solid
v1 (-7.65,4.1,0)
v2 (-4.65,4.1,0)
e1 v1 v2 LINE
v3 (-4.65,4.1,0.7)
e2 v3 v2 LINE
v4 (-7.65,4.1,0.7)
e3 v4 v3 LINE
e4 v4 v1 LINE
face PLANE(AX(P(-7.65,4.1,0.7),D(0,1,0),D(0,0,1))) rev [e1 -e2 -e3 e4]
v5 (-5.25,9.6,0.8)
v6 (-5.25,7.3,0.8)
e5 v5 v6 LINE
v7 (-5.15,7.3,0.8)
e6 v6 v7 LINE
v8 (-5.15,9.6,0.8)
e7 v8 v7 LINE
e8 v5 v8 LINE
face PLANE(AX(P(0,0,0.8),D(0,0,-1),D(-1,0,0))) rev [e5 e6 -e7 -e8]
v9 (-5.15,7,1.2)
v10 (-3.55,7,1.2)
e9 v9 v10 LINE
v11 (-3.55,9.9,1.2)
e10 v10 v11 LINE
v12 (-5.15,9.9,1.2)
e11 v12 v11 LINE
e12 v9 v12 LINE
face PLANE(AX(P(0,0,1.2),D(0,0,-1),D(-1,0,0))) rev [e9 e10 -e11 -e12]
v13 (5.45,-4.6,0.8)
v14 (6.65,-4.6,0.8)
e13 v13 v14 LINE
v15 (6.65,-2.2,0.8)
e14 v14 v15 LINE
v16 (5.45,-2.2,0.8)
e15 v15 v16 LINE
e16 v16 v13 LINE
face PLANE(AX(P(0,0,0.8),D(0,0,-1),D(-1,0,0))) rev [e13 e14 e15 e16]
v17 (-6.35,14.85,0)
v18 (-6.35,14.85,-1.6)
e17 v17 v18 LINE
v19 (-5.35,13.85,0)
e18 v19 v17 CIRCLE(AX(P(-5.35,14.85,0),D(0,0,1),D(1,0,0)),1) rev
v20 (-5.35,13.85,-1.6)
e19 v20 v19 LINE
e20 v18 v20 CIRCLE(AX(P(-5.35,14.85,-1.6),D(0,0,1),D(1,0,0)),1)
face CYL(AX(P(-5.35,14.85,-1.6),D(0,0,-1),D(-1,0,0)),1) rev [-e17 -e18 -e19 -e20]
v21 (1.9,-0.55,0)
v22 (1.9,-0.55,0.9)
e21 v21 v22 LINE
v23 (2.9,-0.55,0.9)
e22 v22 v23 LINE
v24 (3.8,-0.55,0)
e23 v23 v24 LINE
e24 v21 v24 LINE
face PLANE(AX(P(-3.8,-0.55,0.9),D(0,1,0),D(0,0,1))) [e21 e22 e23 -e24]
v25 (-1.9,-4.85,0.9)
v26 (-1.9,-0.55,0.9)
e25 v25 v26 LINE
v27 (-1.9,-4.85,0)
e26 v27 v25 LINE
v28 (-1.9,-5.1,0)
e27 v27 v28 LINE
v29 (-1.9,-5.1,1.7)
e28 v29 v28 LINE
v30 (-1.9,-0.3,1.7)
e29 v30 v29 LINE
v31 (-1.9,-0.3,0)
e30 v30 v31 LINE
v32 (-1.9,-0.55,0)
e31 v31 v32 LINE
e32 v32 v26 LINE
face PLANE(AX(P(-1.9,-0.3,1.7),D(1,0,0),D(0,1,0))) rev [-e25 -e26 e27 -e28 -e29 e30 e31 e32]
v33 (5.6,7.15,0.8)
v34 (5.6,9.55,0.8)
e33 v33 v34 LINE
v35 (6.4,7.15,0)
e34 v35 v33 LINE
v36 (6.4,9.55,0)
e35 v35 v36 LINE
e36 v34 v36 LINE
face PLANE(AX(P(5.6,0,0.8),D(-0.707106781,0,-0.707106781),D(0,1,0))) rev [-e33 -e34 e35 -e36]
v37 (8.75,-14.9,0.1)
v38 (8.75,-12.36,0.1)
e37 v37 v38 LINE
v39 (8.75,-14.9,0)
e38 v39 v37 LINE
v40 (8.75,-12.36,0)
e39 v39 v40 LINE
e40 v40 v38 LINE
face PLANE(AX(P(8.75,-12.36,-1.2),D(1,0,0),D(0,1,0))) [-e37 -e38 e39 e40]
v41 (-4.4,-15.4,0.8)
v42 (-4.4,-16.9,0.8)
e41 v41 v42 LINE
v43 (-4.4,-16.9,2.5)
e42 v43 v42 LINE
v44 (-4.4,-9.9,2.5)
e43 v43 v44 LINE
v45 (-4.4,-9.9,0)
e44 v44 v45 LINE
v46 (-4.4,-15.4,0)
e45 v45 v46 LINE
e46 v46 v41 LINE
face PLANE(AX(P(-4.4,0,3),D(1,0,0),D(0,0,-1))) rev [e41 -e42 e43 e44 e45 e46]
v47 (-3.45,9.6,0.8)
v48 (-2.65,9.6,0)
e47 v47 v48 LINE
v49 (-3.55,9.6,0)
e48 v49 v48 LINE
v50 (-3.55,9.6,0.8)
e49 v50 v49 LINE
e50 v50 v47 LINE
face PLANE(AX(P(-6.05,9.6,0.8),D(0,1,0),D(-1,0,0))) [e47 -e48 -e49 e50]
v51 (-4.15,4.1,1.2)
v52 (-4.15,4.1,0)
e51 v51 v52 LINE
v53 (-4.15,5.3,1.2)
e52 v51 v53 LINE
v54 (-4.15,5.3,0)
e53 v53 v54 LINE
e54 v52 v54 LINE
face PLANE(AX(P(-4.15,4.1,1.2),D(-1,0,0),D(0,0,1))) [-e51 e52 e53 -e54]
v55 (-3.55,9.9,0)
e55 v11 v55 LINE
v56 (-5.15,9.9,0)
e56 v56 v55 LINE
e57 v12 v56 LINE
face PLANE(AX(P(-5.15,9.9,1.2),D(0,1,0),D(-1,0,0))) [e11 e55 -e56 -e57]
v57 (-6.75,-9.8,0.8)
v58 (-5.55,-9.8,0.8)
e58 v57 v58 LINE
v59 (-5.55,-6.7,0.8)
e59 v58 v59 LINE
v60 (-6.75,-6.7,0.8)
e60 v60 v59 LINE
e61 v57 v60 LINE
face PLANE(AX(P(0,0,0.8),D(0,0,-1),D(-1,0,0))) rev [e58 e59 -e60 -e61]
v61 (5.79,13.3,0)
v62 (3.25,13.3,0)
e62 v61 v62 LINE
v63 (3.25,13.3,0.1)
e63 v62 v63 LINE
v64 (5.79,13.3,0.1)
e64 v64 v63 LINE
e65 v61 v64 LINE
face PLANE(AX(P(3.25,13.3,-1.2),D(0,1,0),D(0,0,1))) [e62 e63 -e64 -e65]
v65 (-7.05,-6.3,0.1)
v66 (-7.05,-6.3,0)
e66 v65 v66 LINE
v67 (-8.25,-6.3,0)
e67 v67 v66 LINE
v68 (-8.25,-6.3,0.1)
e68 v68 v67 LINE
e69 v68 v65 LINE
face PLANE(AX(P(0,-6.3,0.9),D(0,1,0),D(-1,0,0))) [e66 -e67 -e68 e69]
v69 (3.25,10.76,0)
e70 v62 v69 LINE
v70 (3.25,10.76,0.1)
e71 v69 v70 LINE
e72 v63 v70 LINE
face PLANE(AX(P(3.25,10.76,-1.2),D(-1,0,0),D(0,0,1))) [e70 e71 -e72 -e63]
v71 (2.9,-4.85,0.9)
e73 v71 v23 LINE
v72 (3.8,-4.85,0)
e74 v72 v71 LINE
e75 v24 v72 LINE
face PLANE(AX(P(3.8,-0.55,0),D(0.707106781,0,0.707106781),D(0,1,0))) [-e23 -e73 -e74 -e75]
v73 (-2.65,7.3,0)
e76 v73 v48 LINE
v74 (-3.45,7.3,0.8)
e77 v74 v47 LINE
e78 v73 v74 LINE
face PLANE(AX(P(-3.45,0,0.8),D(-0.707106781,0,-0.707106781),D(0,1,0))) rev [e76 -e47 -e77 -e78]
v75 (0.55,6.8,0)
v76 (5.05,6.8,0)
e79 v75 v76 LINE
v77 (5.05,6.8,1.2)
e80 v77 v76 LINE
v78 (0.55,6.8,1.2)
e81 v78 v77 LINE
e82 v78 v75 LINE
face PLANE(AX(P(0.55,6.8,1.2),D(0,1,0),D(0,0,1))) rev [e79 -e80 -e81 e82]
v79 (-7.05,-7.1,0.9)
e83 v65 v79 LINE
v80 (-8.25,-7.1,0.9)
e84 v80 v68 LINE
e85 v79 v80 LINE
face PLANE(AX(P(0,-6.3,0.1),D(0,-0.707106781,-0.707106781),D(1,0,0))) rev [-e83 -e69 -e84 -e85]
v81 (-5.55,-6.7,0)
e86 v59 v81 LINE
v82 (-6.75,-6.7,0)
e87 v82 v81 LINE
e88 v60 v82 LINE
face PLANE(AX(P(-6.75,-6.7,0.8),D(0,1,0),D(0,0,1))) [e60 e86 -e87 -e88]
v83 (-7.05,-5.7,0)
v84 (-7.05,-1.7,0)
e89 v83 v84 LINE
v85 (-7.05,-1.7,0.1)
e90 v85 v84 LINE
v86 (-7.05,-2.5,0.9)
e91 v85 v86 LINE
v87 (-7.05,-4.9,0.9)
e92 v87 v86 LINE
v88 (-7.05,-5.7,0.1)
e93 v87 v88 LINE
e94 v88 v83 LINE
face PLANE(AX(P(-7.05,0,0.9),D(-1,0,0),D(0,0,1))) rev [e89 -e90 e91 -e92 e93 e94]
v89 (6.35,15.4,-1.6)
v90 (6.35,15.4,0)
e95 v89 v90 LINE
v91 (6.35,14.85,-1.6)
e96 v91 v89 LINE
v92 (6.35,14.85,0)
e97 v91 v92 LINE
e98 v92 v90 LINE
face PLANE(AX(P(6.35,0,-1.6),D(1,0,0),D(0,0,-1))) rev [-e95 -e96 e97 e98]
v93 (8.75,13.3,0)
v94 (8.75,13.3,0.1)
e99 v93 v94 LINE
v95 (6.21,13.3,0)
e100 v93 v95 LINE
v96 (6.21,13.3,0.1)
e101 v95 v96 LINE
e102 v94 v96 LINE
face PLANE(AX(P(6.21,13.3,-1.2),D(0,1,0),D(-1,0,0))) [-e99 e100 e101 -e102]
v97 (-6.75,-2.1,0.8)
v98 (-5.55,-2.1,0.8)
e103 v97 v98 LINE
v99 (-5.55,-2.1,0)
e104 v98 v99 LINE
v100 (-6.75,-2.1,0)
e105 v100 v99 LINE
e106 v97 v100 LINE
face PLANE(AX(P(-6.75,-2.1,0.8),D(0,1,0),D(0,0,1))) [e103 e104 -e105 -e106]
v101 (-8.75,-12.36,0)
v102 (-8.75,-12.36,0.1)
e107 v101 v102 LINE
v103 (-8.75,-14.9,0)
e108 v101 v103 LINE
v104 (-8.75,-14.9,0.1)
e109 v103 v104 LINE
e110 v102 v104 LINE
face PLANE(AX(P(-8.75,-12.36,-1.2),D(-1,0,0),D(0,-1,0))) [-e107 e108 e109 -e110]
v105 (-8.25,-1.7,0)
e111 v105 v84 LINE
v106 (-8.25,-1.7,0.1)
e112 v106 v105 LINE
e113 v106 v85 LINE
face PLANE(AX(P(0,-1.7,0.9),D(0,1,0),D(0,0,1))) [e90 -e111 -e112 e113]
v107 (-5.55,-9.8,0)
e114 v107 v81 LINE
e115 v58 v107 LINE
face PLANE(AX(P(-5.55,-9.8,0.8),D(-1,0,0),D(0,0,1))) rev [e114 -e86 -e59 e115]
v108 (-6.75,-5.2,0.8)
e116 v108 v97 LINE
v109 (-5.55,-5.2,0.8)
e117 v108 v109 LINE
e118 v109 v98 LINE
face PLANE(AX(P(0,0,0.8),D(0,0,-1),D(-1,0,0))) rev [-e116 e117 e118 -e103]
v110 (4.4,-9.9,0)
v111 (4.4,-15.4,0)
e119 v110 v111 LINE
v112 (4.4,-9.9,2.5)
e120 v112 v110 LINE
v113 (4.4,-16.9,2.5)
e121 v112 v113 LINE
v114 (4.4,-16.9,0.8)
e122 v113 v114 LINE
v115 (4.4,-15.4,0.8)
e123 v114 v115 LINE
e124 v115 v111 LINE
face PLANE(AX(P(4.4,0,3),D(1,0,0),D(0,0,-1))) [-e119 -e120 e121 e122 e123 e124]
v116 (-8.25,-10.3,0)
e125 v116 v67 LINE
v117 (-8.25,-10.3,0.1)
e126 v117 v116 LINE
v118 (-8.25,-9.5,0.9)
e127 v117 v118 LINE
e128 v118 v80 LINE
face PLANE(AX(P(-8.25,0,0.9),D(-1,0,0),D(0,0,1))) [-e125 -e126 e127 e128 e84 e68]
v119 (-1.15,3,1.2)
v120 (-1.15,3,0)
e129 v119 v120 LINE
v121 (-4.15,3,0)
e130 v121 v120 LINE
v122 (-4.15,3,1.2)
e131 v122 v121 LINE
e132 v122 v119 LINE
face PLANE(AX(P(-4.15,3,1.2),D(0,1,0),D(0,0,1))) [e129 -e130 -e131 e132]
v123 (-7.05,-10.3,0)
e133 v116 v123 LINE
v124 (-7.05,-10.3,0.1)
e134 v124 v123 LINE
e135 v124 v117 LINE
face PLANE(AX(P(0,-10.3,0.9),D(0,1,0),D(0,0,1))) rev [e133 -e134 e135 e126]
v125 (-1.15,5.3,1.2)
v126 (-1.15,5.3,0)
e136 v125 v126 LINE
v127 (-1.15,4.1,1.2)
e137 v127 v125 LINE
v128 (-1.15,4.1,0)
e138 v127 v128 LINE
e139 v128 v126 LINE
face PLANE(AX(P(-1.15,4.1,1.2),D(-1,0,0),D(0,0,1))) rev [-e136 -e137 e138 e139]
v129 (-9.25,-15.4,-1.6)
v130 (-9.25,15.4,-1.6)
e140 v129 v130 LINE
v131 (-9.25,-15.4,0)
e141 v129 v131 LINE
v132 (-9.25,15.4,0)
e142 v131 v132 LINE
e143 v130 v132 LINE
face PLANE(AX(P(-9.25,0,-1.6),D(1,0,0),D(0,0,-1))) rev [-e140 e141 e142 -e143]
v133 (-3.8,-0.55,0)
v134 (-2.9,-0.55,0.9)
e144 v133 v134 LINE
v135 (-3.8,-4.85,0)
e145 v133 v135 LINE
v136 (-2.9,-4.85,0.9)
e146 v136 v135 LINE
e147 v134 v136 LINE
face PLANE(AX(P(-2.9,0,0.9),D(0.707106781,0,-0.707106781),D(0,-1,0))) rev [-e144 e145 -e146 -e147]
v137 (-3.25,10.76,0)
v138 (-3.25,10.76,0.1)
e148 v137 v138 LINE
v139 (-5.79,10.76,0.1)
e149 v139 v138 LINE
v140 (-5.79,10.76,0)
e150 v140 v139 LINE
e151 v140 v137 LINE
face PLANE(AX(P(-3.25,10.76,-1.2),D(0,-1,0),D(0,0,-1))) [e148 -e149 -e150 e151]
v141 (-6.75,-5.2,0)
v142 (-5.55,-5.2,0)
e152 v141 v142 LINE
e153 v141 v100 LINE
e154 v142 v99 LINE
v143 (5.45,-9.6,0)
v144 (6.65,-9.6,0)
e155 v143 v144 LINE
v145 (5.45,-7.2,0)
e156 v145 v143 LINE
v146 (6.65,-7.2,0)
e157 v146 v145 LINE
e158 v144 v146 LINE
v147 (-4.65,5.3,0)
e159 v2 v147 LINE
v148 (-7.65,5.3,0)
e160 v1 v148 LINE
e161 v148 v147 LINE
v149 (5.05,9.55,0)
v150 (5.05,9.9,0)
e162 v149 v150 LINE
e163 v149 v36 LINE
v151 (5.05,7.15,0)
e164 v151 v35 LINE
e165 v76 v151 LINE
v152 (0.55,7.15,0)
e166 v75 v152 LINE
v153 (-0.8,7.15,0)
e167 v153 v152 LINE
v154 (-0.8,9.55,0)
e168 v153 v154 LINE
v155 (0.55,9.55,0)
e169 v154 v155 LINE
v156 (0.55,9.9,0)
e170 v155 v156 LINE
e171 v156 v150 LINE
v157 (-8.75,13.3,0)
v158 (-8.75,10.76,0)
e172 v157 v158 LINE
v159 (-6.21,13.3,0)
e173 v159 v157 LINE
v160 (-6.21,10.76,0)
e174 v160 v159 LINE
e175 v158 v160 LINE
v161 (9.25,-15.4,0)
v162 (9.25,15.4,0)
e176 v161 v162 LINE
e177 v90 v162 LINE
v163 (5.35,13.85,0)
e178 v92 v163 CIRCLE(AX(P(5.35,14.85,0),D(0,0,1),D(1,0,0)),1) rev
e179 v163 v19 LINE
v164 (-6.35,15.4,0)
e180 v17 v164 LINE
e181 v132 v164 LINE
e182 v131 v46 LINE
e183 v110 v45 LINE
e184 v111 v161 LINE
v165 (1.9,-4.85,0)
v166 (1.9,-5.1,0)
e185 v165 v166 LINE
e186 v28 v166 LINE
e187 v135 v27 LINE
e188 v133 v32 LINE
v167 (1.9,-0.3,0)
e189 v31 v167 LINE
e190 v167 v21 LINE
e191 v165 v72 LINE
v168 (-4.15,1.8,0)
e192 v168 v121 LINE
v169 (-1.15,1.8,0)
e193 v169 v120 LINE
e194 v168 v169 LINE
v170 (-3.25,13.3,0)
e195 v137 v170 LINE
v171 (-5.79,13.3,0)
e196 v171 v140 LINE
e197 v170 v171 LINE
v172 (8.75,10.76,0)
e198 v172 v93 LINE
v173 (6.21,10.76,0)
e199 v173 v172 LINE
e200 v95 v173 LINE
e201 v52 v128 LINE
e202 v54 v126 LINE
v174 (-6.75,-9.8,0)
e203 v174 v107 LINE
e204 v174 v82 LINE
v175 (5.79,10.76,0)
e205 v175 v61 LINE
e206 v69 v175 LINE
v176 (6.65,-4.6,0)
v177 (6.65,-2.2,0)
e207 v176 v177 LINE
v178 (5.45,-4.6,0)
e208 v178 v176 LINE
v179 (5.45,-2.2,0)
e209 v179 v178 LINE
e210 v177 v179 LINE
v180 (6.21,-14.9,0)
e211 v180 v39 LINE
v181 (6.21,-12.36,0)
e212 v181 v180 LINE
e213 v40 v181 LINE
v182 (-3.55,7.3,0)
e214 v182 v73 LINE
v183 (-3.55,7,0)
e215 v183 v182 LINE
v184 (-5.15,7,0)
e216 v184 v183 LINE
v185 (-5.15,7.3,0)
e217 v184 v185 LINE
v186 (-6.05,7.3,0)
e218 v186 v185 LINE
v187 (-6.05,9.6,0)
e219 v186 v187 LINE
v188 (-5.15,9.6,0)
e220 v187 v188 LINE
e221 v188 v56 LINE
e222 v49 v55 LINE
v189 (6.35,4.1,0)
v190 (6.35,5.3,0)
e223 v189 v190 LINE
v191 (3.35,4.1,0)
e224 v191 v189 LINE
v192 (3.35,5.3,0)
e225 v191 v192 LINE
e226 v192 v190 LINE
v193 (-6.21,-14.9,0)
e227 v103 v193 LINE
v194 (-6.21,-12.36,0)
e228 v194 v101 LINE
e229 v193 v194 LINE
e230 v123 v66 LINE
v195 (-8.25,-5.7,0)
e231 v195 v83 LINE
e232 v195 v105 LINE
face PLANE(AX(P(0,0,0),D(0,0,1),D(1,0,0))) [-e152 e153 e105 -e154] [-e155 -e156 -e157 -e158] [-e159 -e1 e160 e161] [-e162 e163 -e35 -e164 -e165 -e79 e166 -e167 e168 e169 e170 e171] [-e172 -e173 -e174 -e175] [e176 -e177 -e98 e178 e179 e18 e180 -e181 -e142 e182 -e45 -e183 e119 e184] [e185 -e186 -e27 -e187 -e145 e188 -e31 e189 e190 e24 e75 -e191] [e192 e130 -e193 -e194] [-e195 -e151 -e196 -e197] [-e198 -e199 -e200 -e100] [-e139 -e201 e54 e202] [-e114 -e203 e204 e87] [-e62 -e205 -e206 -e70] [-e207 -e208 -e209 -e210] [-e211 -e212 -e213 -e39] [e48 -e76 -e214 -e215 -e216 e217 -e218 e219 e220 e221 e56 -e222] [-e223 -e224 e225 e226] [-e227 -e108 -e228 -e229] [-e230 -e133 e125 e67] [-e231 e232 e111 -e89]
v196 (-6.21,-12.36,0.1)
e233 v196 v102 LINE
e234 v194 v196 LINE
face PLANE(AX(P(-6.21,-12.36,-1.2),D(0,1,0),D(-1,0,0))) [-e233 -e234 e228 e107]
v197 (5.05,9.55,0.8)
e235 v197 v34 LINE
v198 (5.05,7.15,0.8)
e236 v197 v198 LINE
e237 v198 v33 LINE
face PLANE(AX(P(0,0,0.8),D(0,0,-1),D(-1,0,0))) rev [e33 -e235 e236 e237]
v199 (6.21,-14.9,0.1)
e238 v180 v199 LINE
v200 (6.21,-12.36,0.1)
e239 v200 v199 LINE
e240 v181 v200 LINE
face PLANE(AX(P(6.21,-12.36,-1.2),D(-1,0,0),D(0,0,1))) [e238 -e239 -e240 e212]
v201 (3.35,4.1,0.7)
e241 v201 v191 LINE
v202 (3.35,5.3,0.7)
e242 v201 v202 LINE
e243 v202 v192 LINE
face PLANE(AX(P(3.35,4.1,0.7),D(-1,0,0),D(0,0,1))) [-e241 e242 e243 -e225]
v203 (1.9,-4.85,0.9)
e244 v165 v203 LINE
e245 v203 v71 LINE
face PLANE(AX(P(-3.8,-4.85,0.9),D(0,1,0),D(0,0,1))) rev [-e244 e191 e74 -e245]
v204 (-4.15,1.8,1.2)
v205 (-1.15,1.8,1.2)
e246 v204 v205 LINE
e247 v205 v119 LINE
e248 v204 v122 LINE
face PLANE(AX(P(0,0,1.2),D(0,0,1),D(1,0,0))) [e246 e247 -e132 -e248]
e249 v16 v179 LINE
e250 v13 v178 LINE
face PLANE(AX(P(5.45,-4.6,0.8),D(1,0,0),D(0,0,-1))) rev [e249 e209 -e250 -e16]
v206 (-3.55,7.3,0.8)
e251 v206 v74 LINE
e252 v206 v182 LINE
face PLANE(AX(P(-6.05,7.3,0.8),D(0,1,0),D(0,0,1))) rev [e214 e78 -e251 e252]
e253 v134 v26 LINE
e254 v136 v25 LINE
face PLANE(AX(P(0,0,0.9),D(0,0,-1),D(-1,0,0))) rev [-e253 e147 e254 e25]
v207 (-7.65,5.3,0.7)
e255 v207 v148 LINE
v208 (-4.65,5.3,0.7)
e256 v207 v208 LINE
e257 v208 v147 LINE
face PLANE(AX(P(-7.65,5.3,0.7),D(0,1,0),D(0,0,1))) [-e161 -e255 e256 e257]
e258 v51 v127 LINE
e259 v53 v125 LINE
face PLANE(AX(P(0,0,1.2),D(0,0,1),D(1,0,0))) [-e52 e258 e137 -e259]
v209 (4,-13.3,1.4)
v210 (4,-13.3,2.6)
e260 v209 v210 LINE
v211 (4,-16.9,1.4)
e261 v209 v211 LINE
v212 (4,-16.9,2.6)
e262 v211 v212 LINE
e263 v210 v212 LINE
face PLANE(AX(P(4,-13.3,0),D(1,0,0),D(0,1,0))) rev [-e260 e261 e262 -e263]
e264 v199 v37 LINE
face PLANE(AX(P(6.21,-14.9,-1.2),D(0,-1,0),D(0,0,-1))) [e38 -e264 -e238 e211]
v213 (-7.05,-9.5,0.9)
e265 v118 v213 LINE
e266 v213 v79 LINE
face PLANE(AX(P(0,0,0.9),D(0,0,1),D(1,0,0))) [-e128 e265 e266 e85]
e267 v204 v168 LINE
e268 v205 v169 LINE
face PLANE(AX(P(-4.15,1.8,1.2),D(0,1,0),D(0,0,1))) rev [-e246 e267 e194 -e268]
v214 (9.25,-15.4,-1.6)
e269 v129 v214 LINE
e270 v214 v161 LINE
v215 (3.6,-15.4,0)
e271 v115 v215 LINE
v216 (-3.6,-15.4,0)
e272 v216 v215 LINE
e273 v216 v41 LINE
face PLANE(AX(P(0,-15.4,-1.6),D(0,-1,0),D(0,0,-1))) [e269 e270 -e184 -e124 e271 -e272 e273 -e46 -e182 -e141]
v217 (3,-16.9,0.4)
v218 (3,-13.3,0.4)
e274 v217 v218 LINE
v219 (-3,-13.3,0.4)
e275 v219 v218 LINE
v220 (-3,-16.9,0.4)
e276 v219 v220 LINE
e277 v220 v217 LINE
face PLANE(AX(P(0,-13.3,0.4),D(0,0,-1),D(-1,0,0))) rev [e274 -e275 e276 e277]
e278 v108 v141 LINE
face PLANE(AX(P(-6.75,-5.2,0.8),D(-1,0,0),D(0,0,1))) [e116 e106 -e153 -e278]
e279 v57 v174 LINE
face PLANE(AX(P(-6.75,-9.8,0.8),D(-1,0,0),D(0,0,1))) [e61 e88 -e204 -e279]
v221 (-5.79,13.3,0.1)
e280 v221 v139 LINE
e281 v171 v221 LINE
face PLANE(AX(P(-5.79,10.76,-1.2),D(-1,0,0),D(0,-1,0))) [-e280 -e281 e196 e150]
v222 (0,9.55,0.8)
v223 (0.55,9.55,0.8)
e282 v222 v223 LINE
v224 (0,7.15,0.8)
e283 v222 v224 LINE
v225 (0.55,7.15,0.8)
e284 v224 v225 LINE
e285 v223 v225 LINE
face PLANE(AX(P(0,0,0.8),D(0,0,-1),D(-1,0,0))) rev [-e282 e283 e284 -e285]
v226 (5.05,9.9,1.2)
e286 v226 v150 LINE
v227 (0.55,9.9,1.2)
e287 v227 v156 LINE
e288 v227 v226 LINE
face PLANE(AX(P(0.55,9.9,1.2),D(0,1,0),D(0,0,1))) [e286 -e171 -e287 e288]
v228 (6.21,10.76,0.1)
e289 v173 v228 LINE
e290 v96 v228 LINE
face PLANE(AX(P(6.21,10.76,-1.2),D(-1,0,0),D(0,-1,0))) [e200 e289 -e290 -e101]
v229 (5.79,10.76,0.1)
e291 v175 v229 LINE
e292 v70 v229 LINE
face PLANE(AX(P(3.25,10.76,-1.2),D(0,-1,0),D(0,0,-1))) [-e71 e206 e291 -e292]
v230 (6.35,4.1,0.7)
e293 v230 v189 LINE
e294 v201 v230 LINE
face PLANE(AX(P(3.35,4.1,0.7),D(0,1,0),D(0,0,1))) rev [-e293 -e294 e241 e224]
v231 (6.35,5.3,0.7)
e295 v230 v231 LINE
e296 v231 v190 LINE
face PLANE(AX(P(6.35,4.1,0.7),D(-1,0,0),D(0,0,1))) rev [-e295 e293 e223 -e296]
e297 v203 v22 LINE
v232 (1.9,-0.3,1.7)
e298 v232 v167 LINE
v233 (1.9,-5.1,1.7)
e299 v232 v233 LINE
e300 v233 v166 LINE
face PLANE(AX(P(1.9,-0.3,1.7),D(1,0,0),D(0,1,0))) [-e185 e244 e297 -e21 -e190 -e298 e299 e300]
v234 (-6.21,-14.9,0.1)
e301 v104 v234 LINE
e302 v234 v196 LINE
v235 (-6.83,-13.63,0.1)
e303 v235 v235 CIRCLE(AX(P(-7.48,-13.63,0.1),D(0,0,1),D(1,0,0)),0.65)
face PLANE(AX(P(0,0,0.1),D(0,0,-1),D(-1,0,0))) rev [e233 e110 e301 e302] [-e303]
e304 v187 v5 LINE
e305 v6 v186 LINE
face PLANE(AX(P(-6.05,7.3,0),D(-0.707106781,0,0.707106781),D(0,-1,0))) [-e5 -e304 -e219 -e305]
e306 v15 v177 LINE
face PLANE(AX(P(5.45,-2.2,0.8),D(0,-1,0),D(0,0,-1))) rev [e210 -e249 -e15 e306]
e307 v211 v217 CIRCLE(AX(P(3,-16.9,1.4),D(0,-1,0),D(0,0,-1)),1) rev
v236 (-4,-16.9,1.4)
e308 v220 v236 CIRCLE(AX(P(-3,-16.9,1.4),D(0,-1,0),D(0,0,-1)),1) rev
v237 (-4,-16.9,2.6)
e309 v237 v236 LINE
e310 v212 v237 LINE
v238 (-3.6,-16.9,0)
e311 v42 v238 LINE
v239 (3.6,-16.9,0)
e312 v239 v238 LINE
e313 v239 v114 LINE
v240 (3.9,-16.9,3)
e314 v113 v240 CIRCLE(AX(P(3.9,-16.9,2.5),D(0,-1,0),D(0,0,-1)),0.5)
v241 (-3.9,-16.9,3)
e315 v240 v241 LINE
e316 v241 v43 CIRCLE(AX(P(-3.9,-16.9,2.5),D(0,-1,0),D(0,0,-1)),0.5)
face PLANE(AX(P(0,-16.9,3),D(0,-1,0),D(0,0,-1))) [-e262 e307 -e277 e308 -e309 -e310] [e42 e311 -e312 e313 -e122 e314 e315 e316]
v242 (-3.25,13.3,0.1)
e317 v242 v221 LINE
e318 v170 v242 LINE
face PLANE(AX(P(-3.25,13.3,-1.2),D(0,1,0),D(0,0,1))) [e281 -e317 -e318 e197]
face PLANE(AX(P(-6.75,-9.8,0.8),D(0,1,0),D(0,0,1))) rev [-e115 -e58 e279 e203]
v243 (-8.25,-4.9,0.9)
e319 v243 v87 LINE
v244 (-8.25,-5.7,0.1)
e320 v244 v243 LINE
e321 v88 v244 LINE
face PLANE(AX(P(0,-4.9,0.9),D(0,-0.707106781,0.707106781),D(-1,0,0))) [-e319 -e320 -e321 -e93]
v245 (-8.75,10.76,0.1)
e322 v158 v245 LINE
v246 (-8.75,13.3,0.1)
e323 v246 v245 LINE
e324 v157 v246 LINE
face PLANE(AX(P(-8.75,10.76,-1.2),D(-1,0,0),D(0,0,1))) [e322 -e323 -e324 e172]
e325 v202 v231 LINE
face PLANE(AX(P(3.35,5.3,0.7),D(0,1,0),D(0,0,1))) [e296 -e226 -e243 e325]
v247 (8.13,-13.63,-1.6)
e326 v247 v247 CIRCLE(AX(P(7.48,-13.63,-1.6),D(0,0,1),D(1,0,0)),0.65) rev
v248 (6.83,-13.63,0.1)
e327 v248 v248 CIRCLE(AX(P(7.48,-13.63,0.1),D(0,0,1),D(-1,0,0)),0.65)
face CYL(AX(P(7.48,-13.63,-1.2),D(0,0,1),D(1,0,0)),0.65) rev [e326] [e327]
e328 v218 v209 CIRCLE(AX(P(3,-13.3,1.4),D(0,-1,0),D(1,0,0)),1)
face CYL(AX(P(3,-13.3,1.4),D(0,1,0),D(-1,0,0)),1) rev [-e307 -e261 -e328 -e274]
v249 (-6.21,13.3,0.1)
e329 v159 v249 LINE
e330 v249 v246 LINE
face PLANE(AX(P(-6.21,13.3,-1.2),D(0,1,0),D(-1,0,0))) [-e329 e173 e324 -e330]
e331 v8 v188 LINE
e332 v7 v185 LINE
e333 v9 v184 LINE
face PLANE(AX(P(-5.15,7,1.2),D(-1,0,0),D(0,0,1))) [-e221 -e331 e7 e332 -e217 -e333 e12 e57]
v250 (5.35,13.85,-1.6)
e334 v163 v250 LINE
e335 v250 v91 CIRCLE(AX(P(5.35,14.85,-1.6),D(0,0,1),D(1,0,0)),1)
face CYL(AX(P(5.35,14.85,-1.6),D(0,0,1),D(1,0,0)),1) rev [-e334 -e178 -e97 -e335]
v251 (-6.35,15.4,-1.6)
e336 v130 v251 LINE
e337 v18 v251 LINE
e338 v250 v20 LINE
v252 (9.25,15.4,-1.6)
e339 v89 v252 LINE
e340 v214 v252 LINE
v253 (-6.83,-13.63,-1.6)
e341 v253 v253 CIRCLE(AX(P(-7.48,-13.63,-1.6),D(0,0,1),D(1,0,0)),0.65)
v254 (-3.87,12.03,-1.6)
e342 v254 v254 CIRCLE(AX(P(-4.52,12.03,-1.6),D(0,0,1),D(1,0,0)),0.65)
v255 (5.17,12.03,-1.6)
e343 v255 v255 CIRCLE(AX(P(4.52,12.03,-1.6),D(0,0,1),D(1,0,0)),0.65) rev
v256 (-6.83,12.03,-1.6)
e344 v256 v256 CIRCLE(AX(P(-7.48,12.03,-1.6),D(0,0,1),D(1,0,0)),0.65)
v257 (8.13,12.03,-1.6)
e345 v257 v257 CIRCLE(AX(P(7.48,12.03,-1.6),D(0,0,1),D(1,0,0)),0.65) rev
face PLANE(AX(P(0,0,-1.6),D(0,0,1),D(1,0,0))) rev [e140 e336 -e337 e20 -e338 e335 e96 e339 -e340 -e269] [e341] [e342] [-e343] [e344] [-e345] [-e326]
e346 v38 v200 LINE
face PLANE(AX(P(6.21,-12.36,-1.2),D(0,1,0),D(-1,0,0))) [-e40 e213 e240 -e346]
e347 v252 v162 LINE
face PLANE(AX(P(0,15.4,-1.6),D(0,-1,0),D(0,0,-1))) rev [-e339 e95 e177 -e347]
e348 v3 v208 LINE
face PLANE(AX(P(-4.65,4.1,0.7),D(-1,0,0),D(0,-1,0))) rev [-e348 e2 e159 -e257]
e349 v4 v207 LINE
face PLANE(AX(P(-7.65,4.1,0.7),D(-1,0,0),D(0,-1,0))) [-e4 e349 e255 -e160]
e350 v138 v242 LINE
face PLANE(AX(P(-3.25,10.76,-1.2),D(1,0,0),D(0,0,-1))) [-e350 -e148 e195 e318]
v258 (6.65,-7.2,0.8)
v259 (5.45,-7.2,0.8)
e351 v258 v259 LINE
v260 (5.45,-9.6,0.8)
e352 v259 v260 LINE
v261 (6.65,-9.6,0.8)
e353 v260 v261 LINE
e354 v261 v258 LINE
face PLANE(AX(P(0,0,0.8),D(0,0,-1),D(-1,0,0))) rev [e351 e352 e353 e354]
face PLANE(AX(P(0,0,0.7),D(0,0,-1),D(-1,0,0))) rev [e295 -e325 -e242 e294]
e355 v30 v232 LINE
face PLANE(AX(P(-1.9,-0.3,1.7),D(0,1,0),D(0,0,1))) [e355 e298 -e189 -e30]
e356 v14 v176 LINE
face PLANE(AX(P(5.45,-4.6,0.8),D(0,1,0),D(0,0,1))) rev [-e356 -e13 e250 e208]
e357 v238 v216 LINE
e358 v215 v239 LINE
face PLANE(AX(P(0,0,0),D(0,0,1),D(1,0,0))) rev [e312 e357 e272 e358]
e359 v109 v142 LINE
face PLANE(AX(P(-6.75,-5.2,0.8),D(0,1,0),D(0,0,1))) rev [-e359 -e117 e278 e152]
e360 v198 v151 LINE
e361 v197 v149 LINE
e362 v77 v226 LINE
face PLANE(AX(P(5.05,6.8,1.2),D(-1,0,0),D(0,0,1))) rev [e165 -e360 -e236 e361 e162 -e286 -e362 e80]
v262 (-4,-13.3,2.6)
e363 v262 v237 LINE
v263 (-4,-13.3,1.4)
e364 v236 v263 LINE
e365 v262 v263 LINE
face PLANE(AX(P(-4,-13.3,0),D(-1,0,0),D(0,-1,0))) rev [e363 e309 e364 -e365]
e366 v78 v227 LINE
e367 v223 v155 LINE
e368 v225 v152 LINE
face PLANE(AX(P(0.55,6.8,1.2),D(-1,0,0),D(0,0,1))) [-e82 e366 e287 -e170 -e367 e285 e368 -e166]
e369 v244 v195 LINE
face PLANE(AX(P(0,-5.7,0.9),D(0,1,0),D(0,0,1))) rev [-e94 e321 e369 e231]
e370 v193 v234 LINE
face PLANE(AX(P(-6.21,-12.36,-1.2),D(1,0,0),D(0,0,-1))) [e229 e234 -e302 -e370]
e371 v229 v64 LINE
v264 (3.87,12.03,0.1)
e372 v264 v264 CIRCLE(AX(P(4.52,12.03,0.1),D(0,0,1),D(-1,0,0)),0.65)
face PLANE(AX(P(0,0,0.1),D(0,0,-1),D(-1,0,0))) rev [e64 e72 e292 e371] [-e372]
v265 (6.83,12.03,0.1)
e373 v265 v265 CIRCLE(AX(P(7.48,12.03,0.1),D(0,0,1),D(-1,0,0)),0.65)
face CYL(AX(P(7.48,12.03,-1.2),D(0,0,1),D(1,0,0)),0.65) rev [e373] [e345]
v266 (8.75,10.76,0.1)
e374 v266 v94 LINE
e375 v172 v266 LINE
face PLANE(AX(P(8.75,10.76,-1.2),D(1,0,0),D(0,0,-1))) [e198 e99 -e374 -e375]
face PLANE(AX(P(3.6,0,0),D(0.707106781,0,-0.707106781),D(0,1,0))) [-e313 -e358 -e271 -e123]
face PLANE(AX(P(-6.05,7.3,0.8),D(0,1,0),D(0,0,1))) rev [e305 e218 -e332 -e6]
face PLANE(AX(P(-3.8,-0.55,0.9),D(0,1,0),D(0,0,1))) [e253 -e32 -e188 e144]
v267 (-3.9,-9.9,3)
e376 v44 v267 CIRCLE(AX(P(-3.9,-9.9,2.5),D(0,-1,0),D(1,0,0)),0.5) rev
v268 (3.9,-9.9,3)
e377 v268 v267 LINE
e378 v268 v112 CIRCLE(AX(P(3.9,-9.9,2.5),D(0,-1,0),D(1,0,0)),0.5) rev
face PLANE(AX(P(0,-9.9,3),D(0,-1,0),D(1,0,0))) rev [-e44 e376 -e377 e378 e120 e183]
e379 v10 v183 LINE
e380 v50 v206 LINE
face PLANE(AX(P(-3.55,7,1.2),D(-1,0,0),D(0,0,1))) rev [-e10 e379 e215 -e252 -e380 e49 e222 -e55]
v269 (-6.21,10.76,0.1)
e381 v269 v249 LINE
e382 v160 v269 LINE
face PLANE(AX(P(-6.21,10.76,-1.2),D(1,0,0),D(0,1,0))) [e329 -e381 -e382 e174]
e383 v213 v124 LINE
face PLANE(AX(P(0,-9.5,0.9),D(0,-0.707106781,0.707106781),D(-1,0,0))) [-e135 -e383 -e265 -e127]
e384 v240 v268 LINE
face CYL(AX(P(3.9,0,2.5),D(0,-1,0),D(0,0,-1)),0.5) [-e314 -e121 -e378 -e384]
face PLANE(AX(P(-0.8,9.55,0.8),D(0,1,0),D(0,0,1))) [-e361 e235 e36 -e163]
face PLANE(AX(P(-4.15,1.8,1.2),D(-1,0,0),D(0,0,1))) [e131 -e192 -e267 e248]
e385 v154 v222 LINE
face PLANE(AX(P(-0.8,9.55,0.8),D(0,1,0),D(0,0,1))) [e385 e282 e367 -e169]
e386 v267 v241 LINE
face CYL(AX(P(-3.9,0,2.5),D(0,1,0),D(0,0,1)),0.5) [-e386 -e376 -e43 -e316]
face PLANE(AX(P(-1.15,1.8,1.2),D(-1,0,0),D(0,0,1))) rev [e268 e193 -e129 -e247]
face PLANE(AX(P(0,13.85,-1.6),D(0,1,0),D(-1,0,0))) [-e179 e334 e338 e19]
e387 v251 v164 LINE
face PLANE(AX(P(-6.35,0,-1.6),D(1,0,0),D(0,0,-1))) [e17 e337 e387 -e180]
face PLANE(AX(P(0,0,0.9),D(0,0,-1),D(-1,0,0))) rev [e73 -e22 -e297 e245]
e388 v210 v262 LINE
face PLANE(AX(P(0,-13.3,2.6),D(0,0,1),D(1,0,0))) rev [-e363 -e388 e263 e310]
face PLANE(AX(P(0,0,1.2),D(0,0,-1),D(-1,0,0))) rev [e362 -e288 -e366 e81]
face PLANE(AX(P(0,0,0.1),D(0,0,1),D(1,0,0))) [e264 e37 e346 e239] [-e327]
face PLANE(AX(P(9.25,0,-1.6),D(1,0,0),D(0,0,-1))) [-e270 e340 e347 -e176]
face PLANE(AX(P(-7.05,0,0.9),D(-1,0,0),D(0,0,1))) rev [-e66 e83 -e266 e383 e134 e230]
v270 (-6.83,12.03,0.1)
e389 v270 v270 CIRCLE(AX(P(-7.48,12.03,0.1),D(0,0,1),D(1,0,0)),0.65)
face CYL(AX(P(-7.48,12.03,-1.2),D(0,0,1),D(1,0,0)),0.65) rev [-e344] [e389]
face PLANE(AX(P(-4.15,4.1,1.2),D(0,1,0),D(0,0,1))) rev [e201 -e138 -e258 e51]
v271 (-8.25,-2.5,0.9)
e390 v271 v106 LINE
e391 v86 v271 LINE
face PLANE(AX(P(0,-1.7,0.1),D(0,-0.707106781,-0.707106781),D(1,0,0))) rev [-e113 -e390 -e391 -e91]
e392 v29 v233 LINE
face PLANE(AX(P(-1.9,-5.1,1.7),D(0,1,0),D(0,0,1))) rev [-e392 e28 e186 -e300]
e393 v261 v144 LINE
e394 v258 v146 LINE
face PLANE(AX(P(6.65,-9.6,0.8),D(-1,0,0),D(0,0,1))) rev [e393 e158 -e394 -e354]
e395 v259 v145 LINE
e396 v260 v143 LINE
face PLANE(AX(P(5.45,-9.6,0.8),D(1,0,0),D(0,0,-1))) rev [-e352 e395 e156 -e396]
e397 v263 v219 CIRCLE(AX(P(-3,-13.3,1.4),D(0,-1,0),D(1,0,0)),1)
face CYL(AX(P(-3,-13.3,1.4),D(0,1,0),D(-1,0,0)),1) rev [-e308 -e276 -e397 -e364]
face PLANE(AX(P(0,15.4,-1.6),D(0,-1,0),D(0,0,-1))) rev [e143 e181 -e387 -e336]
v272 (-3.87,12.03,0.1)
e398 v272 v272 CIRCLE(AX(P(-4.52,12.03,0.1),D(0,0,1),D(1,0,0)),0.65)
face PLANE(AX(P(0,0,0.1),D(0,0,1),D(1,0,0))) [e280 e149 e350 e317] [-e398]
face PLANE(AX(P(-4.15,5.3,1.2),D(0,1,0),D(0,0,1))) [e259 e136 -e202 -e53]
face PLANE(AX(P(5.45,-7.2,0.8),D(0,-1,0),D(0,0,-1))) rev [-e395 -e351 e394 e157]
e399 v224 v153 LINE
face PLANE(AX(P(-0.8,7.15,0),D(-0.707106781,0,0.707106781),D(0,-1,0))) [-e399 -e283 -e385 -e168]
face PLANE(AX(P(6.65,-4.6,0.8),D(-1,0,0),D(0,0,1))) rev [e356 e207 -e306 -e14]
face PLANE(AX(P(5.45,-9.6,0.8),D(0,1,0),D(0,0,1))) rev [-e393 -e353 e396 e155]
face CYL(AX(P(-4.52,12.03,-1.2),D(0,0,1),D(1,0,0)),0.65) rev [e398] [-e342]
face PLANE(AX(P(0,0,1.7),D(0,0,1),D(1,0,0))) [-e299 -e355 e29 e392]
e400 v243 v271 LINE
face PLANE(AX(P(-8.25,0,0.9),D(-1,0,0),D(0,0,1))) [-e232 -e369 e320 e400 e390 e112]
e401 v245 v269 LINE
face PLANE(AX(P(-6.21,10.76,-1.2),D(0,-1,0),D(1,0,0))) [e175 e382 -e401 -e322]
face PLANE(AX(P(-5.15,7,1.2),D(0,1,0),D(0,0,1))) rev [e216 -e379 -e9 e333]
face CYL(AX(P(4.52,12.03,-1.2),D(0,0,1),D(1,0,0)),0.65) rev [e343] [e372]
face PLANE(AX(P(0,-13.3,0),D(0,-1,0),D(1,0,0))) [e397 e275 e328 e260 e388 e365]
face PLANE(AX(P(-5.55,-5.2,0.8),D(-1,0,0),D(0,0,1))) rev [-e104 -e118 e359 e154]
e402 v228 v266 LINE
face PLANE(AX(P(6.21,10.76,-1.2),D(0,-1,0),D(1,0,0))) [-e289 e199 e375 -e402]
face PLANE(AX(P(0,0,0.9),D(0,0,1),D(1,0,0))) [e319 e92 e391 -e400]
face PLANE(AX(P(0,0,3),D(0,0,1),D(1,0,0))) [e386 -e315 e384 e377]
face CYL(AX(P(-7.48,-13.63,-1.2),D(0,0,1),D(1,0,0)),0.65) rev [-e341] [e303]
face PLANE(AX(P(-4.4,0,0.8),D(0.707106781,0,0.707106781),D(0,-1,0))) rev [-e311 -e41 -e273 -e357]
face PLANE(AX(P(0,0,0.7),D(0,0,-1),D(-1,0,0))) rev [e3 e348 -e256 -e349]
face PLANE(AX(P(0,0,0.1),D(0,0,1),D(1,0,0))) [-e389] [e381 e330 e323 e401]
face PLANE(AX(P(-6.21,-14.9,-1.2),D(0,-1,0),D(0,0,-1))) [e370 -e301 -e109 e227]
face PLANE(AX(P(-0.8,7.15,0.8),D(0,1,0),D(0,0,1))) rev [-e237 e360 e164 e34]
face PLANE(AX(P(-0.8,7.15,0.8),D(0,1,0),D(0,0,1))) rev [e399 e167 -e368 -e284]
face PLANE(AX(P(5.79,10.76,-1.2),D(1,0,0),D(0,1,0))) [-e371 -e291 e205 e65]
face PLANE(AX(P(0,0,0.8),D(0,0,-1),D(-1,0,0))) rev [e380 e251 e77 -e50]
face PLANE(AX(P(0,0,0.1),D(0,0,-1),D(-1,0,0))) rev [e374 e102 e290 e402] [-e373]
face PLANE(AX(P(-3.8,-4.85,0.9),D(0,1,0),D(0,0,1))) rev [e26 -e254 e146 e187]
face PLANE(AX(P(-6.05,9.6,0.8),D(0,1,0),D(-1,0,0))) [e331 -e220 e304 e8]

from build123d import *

# Parameters (mm, degrees)
SKICA1_W                      = 8.8
SKICA1_H                      = 5.5
SKICA1_W_2                    = 1.9
SKICA1_H_2                    = 4.3
SKICA1_W_3                    = 3.8
SKICA1_H_3                    = 0.25
P_IDAT_VYSUNUT_M1_DEPTH       = 1.6
ZAOBLIT1_R                    = 1
SKICA1_3_W                    = 8.8
SKICA1_3_H                    = 5.5
SKICA1_3_H_2                  = 1.5
P_IDAT_VYSUNUT_M2_DEPTH       = 3
SKICA1_4_W                    = 3.8
SKICA1_4_H                    = 4.8
P_IDAT_VYSUNUT_M3_DEPTH       = 1.7
SKICA1_5_W                    = 7.6
SKICA1_5_H                    = 4.3
P_IDAT_VYSUNUT_M4_DEPTH       = 0.9
ZKOSEN_1_SIZE                 = 0.9
SKICA2_W                      = 4.5
SKICA2_H                      = 3.1
SKICA2_W_2                    = 1.6
SKICA2_H_2                    = 2.9
P_IDAT_VYSUNUT_M5_DEPTH       = 1.2
SKICA2_3_W                    = 7.2
SKICA2_3_H                    = 2.4
SKICA2_3_W_2                  = 3.4
SKICA2_3_H_2                  = 2.3
P_IDAT_VYSUNUT_M6_DEPTH       = 0.8
ZKOSEN_2_SIZE                 = 0.8
SKICA3_W                      = 8
SKICA3_H                      = 2.2
ODEBRAT_VYSUNUT_M1_DEPTH      = 3.6
ZAOBLIT2_R                    = 1
ZKOSEN_3_SIZE                 = 0.8
ZAOBLIT3_R                    = 0.5
SKICA4_W                      = 1.2
SKICA4_H                      = 2.4
P_IDAT_VYSUNUT_M7_DEPTH       = 0.8
SKICA5_W                      = 3
SKICA5_H                      = 1.2
P_IDAT_VYSUNUT_M8_DEPTH       = 0.7
SKICA5_3_W                    = 3
SKICA5_3_H                    = 1.2
P_IDAT_VYSUNUT_M9_DEPTH       = 1.2
SKICA6_W                      = 1.2
SKICA6_H                      = 3.1
P_IDAT_VYSUNUT_M10_DEPTH      = 0.8
SKICA6_3_W                    = 1.2
SKICA6_3_H                    = 4
P_IDAT_VYSUNUT_M11_DEPTH      = 0.9
ZKOSEN_4_SIZE                 = 0.8
P_IDAT_VYSUNUT_M12_DEPTH      = 0.1
P_IDAT_VYSUNUT_M12_DEPTH_BACK = 1.2
SKICA7_W                      = 2.54
SKICA7_H                      = 2.54
SKICA7_R                      = 0.65
SKICA7_2_R                    = 0.65
ODEBRAT_VYSUNUT_M2_DEPTH      = 20.498012719


with BuildPart() as part:
    # Skica1 → Přidat vysunutím1 (new body)
    # profile 1 of 7: a face of its own
    with BuildSketch(Plane.XY):
        Polygon((-9.25, 15.4), (-9.25, -15.4), (-4.4, -15.4), (-4.4, -9.9), (4.4, -9.9), (4.4, -15.4), (9.25, -15.4), (9.25, 15.4), (6.35, 15.4), (6.35, 13.85), (-6.35, 13.85), (-6.35, 15.4), align=None)
        Polygon((-1.9, -0.55), (-1.9, -0.3), (1.9, -0.3), (1.9, -0.55), (3.8, -0.55), (3.8, -4.85), (1.9, -4.85), (1.9, -5.1), (-1.9, -5.1), (-1.9, -4.85), (-3.8, -4.85), (-3.8, -0.55), align=None, mode=Mode.SUBTRACT)
    # profile 2 of 7: a face of its own
    with BuildSketch(Plane.XY):
        with Locations((0, -12.65)):
            Rectangle(SKICA1_W, SKICA1_H)
    # profile 3 of 7: a face of its own
    with BuildSketch(Plane.XY):
        with Locations((2.85, -2.7)):
            Rectangle(SKICA1_W_2, SKICA1_H_2)
    # profile 4 of 7: a face of its own
    with BuildSketch(Plane.XY):
        with Locations((-2.85, -2.7)):
            Rectangle(SKICA1_W_2, SKICA1_H_2)
    # profile 5 of 7: a face of its own
    with BuildSketch(Plane.XY):
        with Locations((0, -2.7)):
            Rectangle(SKICA1_W_3, SKICA1_H_2)
    # profile 6 of 7: a face of its own
    with BuildSketch(Plane.XY):
        with Locations((0, -4.975)):
            Rectangle(SKICA1_W_3, SKICA1_H_3)
    # profile 7 of 7: a face of its own
    with BuildSketch(Plane.XY):
        with Locations((0, -0.425)):
            Rectangle(SKICA1_W_3, SKICA1_H_3)
    extrude(amount=-P_IDAT_VYSUNUT_M1_DEPTH)

    # Zaoblit1
    zaoblit1_edges = [part.edges().sort_by_distance(p)[0] for p in [
        (-6.35, 13.85, -0.8),
        (6.35, 13.85, -0.8),
    ]]
    fillet(zaoblit1_edges, radius=ZAOBLIT1_R)

    # Skica1<3> → Přidat vysunutím2 (add)
    with BuildSketch(Plane.XY):
        with Locations((0, -12.65)):
            Rectangle(SKICA1_3_W, SKICA1_3_H)
        with Locations((0, -16.15)):
            Rectangle(SKICA1_3_W, SKICA1_3_H_2)
    extrude(amount=P_IDAT_VYSUNUT_M2_DEPTH)

    # Skica1<4> → Přidat vysunutím3 (add)
    with BuildSketch(Plane.XY):
        with Locations((0, -2.7)):
            Rectangle(SKICA1_4_W, SKICA1_4_H)
    extrude(amount=P_IDAT_VYSUNUT_M3_DEPTH)

    # Skica1<5> → Přidat vysunutím4 (add)
    with BuildSketch(Plane.XY):
        with Locations((0, -2.7)):
            Rectangle(SKICA1_5_W, SKICA1_5_H)
    extrude(amount=P_IDAT_VYSUNUT_M4_DEPTH)

    # Zkosení1
    zkosen_1_edges = [part.edges().sort_by_distance(p)[0] for p in [
        (-3.8, -2.7, 0.9),
        (3.8, -2.7, 0.9),
    ]]
    chamfer(zkosen_1_edges, length=ZKOSEN_1_SIZE - 0.0001)  # a hair under: the kernel refuses the full size

    # Skica2 → Přidat vysunutím5 (add)
    with BuildSketch(Plane.XY):
        with Locations((2.8, 8.35)):
            Rectangle(SKICA2_W, SKICA2_H)
        with Locations((-4.35, 8.45)):
            Rectangle(SKICA2_W_2, SKICA2_H_2)
    extrude(amount=P_IDAT_VYSUNUT_M5_DEPTH)

    # Skica2<3> → Přidat vysunutím6 (add)
    with BuildSketch(Plane.XY):
        with Locations((2.8, 8.35)):
            Rectangle(SKICA2_3_W, SKICA2_3_H)
        with Locations((-4.35, 8.45)):
            Rectangle(SKICA2_3_W_2, SKICA2_3_H_2)
    extrude(amount=P_IDAT_VYSUNUT_M6_DEPTH)

    # Zkosení2
    zkosen_2_edges = [part.edges().sort_by_distance(p)[0] for p in [
        (6.4, 8.35, 0.8),
        (-0.8, 8.35, 0.8),
        (-2.65, 8.45, 0.8),
        (-6.05, 8.45, 0.8),
    ]]
    chamfer(zkosen_2_edges, length=ZKOSEN_2_SIZE - 0.0001)  # a hair under: the kernel refuses the full size

    # Skica3 → Odebrat vysunutím1 (cut)
    with BuildSketch(Plane.XZ.offset(16.9)):
        with Locations((0, 1.5)):
            Rectangle(SKICA3_W, SKICA3_H)
    extrude(amount=-ODEBRAT_VYSUNUT_M1_DEPTH, mode=Mode.SUBTRACT)

    # Zaoblit2
    zaoblit2_edges = [part.edges().sort_by_distance(p)[0] for p in [
        (4, -15.1, 0.4),
        (-4, -15.1, 0.4),
    ]]
    fillet(zaoblit2_edges, radius=ZAOBLIT2_R)

    # Zkosení3
    zkosen_3_edges = [part.edges().sort_by_distance(p)[0] for p in [
        (4.4, -16.15, 0),
        (-4.4, -16.15, 0),
    ]]
    chamfer(zkosen_3_edges, length=ZKOSEN_3_SIZE)

    # Zaoblit3
    zaoblit3_edges = [part.edges().sort_by_distance(p)[0] for p in [
        (4.4, -13.4, 3),
        (-4.4, -13.4, 3),
    ]]
    fillet(zaoblit3_edges, radius=ZAOBLIT3_R)

    # Skica4 → Přidat vysunutím7 (add)
    with BuildSketch(Plane.XY):
        with Locations((6.05, -3.4)):
            Rectangle(SKICA4_W, SKICA4_H)
        with Locations((6.05, -8.4)):
            Rectangle(SKICA4_W, SKICA4_H)
    extrude(amount=P_IDAT_VYSUNUT_M7_DEPTH)

    # Skica5 → Přidat vysunutím8 (add)
    with BuildSketch(Plane.XY):
        with Locations((-6.15, 4.7)):
            Rectangle(SKICA5_W, SKICA5_H)
        with Locations((4.85, 4.7)):
            Rectangle(SKICA5_W, SKICA5_H)
    extrude(amount=P_IDAT_VYSUNUT_M8_DEPTH)

    # Skica5<3> → Přidat vysunutím9 (add)
    with BuildSketch(Plane.XY):
        with Locations((-2.65, 4.7)):
            Rectangle(SKICA5_3_W, SKICA5_3_H)
        with Locations((-2.65, 2.4)):
            Rectangle(SKICA5_3_W, SKICA5_3_H)
    extrude(amount=P_IDAT_VYSUNUT_M9_DEPTH)

    # Skica6 → Přidat vysunutím10 (add)
    with BuildSketch(Plane.XY):
        with Locations((-6.15, -3.65)):
            Rectangle(SKICA6_W, SKICA6_H)
        with Locations((-6.15, -8.25)):
            Rectangle(SKICA6_W, SKICA6_H)
    extrude(amount=P_IDAT_VYSUNUT_M10_DEPTH)

    # Skica6<3> → Přidat vysunutím11 (add)
    with BuildSketch(Plane.XY):
        with Locations((-7.65, -8.3)):
            Rectangle(SKICA6_3_W, SKICA6_3_H)
        with Locations((-7.65, -3.7)):
            Rectangle(SKICA6_3_W, SKICA6_3_H)
    extrude(amount=P_IDAT_VYSUNUT_M11_DEPTH)

    # Zkosení4
    zkosen_4_edges = [part.edges().sort_by_distance(p)[0] for p in [
        (-7.65, -6.3, 0.9),
        (-7.65, -10.3, 0.9),
        (-7.65, -1.7, 0.9),
        (-7.65, -5.7, 0.9),
    ]]
    chamfer(zkosen_4_edges, length=ZKOSEN_4_SIZE)

    # Skica7 → Přidat vysunutím12 (add, two sides: drawn at the far end of the back side and taken through both)
    # profile 1 of 6: a face of its own
    with BuildSketch(Plane.XY.offset(-P_IDAT_VYSUNUT_M12_DEPTH_BACK)):
        with Locations((-7.48, 12.03)):
            Rectangle(SKICA7_W, SKICA7_H)
        with Locations((-7.48, 12.03)):
            Circle(SKICA7_R, mode=Mode.SUBTRACT)
    # profile 2 of 6: a face of its own
    with BuildSketch(Plane.XY.offset(-P_IDAT_VYSUNUT_M12_DEPTH_BACK)):
        with Locations((-4.52, 12.03)):
            Rectangle(SKICA7_W, SKICA7_H)
        with Locations((-4.52, 12.03)):
            Circle(SKICA7_R, mode=Mode.SUBTRACT)
    # profile 3 of 6: a face of its own
    with BuildSketch(Plane.XY.offset(-P_IDAT_VYSUNUT_M12_DEPTH_BACK)):
        with Locations((-7.48, -13.63)):
            Rectangle(SKICA7_W, SKICA7_H)
        with Locations((-7.48, -13.63)):
            Circle(SKICA7_R, mode=Mode.SUBTRACT)
    # profile 4 of 6: a face of its own
    with BuildSketch(Plane.XY.offset(-P_IDAT_VYSUNUT_M12_DEPTH_BACK)):
        with Locations((7.48, -13.63)):
            Rectangle(SKICA7_W, SKICA7_H)
        with Locations((7.48, -13.63)):
            Circle(SKICA7_R, mode=Mode.SUBTRACT)
    # profile 5 of 6: a face of its own
    with BuildSketch(Plane.XY.offset(-P_IDAT_VYSUNUT_M12_DEPTH_BACK)):
        with Locations((4.52, 12.03)):
            Rectangle(SKICA7_W, SKICA7_H)
        with Locations((4.52, 12.03)):
            Circle(SKICA7_R, mode=Mode.SUBTRACT)
    # profile 6 of 6: a face of its own
    with BuildSketch(Plane.XY.offset(-P_IDAT_VYSUNUT_M12_DEPTH_BACK)):
        with Locations((7.48, 12.03)):
            Rectangle(SKICA7_W, SKICA7_H)
        with Locations((7.48, 12.03)):
            Circle(SKICA7_R, mode=Mode.SUBTRACT)
    extrude(amount=P_IDAT_VYSUNUT_M12_DEPTH + P_IDAT_VYSUNUT_M12_DEPTH_BACK)

    # Skica7<2> → Odebrat vysunutím2 (cut, through all)
    with BuildSketch(Plane.XY):
        with Locations((-7.48, -13.63)):
            Circle(SKICA7_2_R)
        with Locations((7.48, -13.63)):
            Circle(SKICA7_2_R)
        with Locations((-7.48, 12.03)):
            Circle(SKICA7_2_R)
        with Locations((-4.52, 12.03)):
            Circle(SKICA7_2_R)
        with Locations((4.52, 12.03)):
            Circle(SKICA7_2_R)
        with Locations((7.48, 12.03)):
            Circle(SKICA7_2_R)
    extrude(amount=-ODEBRAT_VYSUNUT_M2_DEPTH, mode=Mode.SUBTRACT)


solid = part.part
